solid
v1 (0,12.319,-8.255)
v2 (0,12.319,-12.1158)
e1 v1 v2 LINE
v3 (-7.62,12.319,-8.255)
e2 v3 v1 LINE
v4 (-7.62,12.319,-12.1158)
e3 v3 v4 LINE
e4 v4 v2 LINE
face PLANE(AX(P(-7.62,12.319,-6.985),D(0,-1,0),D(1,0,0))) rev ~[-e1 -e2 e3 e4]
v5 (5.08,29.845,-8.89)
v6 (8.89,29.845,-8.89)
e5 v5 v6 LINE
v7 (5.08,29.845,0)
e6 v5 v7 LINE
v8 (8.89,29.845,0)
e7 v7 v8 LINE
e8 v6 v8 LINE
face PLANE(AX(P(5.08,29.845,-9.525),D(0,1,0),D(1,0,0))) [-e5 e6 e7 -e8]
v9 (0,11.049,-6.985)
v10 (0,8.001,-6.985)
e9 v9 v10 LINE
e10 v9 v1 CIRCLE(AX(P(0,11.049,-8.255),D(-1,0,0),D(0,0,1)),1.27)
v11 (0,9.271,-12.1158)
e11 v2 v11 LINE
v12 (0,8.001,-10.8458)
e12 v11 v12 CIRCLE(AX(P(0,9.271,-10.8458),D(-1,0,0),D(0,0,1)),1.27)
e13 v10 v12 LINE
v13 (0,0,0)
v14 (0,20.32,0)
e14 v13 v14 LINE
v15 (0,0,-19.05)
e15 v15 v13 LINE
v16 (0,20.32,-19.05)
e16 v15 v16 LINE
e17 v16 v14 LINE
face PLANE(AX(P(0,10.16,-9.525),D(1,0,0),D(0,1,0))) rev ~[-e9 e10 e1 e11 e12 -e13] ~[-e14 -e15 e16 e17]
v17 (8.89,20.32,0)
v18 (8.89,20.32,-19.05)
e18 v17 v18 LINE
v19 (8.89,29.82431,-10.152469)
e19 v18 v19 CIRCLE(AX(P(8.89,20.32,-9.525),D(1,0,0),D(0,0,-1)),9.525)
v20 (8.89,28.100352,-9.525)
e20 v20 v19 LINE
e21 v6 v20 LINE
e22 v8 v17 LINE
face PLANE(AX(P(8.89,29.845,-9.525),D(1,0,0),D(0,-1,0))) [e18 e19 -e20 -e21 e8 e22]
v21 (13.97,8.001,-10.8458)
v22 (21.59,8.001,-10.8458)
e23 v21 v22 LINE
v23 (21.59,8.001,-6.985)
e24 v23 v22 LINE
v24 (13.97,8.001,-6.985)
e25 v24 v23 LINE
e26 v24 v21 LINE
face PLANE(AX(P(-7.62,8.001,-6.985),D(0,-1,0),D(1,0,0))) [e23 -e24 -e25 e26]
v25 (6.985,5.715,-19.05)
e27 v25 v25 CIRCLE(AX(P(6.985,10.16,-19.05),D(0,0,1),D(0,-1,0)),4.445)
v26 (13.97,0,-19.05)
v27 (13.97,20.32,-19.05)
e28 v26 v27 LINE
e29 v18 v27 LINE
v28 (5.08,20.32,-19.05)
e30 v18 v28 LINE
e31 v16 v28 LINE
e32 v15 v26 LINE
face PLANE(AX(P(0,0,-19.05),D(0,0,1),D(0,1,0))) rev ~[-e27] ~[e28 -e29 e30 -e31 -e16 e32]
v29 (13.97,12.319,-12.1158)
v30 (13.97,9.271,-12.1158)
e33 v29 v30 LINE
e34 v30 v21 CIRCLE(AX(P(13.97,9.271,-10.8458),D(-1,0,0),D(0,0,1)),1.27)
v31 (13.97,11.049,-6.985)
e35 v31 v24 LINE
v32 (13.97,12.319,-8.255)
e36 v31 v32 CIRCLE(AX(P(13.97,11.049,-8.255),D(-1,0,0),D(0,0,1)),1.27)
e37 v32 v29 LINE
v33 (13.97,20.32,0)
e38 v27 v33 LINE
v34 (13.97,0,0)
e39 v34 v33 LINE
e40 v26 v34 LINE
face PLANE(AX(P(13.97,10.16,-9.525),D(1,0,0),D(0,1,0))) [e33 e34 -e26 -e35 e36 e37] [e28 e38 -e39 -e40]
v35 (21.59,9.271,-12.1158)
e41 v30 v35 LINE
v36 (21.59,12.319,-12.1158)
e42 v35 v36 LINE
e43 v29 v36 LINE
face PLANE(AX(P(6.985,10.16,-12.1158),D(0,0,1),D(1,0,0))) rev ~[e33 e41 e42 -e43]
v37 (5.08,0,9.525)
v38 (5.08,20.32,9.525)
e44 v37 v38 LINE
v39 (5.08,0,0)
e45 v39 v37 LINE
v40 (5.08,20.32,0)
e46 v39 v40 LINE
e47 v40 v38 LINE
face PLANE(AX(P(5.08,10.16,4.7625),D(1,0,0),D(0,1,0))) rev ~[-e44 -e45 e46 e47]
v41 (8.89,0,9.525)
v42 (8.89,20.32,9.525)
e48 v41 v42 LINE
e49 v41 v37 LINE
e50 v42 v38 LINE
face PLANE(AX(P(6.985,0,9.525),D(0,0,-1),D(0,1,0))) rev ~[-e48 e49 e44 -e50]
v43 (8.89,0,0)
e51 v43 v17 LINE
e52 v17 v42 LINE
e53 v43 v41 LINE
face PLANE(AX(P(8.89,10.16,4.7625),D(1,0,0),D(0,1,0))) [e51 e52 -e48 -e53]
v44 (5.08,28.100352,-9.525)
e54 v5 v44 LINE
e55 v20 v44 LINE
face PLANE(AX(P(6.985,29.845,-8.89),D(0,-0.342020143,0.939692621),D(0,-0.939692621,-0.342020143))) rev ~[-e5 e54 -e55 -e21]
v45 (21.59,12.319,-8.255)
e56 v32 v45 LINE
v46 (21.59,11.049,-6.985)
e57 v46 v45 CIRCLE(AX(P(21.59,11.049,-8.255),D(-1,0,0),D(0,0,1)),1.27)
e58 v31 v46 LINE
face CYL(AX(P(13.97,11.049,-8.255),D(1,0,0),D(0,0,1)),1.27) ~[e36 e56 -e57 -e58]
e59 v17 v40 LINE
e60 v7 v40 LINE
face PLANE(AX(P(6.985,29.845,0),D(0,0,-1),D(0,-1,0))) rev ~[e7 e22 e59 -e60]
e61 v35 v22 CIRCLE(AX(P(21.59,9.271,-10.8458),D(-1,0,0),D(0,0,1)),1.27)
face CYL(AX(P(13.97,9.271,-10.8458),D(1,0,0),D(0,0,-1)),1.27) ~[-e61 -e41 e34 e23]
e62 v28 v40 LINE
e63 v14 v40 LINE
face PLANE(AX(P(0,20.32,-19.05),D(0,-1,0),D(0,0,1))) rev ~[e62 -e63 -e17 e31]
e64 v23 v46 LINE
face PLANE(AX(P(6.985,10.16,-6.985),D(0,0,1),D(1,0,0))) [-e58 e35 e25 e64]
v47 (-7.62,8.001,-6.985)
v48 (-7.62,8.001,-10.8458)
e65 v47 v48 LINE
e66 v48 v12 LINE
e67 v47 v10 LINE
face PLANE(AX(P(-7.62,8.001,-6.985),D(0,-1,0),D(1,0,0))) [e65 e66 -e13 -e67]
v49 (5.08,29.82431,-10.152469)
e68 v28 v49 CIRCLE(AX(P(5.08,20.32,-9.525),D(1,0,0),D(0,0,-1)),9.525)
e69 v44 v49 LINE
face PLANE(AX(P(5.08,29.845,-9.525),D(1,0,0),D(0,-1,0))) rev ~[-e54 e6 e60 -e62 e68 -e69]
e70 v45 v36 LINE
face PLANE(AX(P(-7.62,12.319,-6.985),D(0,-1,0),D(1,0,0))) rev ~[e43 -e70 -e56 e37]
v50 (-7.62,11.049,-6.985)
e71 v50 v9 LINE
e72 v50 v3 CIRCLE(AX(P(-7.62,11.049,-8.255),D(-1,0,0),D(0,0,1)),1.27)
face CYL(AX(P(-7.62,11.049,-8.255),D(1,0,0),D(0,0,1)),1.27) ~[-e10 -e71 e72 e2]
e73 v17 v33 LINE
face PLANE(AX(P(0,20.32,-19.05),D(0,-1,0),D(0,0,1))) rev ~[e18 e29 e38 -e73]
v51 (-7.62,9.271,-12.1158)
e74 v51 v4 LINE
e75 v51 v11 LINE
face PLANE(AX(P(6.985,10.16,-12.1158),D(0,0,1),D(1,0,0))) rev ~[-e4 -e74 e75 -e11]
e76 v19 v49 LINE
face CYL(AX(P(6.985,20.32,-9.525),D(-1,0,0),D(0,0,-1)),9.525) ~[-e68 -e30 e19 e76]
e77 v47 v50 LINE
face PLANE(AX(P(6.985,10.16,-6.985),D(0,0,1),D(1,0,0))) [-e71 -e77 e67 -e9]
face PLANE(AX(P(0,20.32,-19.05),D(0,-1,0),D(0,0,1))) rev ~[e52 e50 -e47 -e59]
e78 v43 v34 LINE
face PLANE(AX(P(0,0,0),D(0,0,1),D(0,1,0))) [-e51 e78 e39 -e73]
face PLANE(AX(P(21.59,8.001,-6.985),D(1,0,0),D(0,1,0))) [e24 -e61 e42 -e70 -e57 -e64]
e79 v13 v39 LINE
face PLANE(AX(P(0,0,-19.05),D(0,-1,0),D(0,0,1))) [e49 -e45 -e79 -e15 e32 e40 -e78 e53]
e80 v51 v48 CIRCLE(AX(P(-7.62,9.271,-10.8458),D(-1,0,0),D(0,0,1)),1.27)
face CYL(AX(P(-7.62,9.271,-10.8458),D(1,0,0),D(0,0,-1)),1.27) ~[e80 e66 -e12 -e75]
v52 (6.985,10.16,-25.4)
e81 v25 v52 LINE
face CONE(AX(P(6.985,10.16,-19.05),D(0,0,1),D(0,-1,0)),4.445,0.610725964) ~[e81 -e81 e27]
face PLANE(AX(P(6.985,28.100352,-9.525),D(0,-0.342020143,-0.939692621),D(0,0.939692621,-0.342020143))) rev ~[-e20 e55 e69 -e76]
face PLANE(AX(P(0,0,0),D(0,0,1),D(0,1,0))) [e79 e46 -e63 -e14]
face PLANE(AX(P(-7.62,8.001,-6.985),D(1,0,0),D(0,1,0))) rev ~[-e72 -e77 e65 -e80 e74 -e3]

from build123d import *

# Parameters (mm, degrees)
F0_W      = 20.32
F0_H      = 19.05
F1_DEPTH  = 13.97
F3_START  = -6.985
F2_W      = 29.21
F2_H      = 4.318
F3_DEPTH  = 5.1308
F7_W      = 20.32
F7_H      = 9.525
F8_DEPTH  = 1.905
F9_DEPTH  = 9.525
F10_R     = 1.27
F12_DEPTH = 25.4


with BuildPart() as f1:
    # F0 (on Right) → F1 (new body)
    with BuildSketch(Plane.YZ):
        with Locations((10.16, -9.525)):
            Rectangle(F0_W, F0_H)
    extrude(amount=F1_DEPTH)

    # F2 (on face) → F3 (join)
    with BuildSketch(Plane.XY.offset(F3_START)):
        with Locations((6.985, 10.16)):
            Rectangle(F2_W, F2_H)
    extrude(amount=-F3_DEPTH)

    # F5 (on offset) → F6 (revolve)
    with BuildSketch(Plane.YZ.offset(6.985)):
        Polygon((10.16, -19.05), (5.715, -19.05), (10.16, -25.4), align=None)
    revolve(axis=Axis((6.985, 10.16, -22.225), (0, 0, 1)))

    # F7 (on offset) → F8 (join, symmetric)
    with BuildSketch(Plane.YZ.offset(6.985)):
        with BuildLine():
            ThreePointArc((20.32, -19.05), (27.0551920908, -16.2601920908), (29.845, -9.525))
            Line((29.845, -9.525), (20.32, -9.525))
            Line((20.32, -9.525), (20.32, -19.05))
        make_face()
        with Locations((10.16, 4.7625)):
            Rectangle(F7_W, F7_H)
    extrude(amount=F8_DEPTH, both=True)

    # F9 (add, through all): a face of the model
    f9_faces = [f1.faces().sort_by_distance(p)[0] for p in [
        (6.985, 25.0825, -9.525),
    ]]
    extrude(f9_faces, amount=F9_DEPTH)

    # F10
    f10_edges = [f1.edges().sort_by_distance(p)[0] for p in [
        (17.78, 8.001, -12.1158),
        (17.78, 12.319, -6.985),
        (-3.81, 8.001, -12.1158),
        (-3.81, 12.319, -6.985),
    ]]
    fillet(f10_edges, radius=F10_R)

    # F11 (on offset) → F12 (cut, symmetric)
    with BuildSketch(Plane.YZ.offset(6.985)):
        Polygon((29.845, -10.16), (29.845, -8.89), (28.1003518386, -9.525), align=None)
    extrude(amount=F12_DEPTH, both=True, mode=Mode.SUBTRACT)


solid = f1.part
